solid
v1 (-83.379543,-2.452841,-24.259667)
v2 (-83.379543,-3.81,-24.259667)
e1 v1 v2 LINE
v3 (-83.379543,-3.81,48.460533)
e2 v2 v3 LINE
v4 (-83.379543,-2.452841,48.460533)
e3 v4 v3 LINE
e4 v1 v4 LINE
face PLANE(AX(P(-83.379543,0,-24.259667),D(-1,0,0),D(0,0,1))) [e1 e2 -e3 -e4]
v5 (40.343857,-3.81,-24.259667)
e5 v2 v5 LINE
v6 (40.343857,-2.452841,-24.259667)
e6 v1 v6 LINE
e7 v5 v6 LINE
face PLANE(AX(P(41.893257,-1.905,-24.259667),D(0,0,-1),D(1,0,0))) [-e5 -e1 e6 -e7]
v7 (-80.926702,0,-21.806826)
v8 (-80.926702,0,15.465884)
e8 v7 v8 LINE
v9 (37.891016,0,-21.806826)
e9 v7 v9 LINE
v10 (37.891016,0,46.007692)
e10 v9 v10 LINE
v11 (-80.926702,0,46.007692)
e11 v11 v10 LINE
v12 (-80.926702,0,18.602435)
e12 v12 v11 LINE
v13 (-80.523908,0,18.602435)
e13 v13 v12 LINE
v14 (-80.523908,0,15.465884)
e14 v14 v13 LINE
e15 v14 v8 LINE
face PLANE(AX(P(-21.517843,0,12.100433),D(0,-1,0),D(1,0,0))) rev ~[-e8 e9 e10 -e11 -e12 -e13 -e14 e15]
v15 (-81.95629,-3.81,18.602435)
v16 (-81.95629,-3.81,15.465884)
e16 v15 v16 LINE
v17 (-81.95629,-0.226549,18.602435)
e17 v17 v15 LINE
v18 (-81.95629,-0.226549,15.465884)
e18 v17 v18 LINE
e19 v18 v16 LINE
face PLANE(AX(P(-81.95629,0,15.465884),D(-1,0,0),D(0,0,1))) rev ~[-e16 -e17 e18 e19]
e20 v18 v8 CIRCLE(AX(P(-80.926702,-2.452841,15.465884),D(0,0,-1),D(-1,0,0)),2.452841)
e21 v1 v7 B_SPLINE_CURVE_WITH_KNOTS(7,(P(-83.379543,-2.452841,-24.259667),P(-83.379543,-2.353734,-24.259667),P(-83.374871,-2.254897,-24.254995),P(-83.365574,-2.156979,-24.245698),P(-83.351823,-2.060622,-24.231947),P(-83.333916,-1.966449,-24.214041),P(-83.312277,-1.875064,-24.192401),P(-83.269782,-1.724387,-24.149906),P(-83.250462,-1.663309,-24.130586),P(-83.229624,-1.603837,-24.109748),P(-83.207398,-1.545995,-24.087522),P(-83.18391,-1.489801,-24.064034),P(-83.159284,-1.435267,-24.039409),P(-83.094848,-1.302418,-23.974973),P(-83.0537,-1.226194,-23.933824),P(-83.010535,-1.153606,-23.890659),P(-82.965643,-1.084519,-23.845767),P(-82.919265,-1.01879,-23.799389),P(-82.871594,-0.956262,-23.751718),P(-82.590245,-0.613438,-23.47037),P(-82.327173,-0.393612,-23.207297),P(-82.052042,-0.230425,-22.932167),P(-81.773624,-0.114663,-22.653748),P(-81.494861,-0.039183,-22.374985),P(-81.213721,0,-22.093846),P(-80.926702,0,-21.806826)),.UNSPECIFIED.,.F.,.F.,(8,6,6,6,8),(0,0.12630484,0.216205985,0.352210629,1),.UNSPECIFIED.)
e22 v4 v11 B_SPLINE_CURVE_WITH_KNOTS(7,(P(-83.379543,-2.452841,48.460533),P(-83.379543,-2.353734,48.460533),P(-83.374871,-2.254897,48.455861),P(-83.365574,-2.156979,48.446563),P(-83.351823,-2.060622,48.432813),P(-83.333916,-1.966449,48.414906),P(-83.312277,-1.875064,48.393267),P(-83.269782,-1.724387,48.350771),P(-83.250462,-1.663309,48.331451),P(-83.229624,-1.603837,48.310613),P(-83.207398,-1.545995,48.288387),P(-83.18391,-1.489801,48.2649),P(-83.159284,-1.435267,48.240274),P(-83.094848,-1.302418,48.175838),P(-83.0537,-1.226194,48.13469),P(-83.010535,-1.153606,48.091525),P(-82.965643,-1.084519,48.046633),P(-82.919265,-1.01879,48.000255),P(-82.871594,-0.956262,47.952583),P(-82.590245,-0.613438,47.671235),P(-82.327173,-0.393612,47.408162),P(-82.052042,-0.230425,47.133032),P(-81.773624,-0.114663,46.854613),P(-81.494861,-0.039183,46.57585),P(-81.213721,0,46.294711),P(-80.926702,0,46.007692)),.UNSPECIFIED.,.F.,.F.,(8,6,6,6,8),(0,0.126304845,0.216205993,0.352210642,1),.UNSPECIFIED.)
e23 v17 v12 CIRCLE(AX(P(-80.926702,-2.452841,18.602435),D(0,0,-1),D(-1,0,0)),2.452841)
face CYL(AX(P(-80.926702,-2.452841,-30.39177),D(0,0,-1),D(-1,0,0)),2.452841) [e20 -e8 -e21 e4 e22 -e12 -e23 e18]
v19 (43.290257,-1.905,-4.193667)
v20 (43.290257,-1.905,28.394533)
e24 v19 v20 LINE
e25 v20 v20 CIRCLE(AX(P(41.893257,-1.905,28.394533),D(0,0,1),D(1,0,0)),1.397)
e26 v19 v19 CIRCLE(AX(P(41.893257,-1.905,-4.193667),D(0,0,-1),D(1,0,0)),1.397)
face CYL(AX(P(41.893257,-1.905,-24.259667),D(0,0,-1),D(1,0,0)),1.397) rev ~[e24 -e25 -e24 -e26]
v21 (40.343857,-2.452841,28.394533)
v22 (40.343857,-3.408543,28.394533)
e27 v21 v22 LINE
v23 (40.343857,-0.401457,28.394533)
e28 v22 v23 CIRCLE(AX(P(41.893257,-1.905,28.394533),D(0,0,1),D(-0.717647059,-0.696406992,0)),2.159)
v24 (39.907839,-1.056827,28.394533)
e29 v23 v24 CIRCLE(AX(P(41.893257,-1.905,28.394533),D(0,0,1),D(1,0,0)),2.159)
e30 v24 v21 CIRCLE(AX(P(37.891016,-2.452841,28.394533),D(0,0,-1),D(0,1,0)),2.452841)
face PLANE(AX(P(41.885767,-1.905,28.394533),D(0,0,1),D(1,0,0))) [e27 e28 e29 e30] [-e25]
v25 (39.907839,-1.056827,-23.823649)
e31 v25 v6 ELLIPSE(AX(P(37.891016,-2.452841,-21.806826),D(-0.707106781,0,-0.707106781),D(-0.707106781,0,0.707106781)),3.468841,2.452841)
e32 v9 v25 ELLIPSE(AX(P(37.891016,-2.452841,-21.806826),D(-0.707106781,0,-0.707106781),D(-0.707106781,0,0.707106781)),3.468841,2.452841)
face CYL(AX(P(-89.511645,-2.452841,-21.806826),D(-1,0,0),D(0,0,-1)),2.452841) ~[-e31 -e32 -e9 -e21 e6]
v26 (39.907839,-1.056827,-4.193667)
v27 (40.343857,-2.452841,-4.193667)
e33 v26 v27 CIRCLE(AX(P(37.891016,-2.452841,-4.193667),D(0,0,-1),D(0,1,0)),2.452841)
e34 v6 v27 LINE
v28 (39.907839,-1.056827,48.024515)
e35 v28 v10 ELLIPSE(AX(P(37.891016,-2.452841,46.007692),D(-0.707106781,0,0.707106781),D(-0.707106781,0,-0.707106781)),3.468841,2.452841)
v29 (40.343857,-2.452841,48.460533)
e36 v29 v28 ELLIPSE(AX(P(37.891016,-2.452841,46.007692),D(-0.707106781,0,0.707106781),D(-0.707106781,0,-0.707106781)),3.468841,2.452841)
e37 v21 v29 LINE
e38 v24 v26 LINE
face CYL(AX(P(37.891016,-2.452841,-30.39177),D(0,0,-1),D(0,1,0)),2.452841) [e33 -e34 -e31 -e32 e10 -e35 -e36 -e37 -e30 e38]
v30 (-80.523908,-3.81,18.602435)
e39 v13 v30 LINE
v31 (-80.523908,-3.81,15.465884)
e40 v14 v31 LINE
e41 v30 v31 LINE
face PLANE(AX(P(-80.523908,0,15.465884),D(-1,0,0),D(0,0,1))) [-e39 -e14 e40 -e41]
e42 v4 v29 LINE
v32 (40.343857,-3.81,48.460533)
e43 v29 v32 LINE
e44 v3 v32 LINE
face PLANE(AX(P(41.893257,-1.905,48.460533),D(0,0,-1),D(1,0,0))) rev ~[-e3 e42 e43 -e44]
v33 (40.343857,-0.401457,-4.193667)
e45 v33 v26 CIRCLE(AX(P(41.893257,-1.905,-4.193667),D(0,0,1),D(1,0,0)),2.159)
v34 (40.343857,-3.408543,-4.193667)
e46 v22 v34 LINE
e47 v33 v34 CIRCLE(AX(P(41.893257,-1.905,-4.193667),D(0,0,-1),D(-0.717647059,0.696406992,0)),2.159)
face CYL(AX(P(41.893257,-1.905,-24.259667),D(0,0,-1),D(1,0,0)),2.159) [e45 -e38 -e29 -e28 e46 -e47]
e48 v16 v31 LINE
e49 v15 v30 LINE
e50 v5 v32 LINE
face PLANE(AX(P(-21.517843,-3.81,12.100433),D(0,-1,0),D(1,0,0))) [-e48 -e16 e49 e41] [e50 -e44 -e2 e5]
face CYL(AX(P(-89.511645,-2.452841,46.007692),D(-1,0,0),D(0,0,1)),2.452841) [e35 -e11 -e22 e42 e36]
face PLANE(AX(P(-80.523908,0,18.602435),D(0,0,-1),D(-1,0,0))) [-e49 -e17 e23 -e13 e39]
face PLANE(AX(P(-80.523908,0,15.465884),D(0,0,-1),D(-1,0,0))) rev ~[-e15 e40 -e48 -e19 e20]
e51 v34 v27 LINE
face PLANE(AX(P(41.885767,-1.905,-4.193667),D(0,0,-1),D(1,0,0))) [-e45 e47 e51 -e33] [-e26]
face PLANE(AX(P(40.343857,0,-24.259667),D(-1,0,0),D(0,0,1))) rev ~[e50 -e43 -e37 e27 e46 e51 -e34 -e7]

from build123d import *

# Parameters (mm, degrees)
F0_W          = 123.7234
F0_H          = 72.7202
F1_DEPTH      = 3.81
F2_R          = 2.159
F2_R_2        = 1.397
F3_DEPTH      = 72.7202
F4_R          = 1.397
F5_DEPTH      = 20.066
F6_R          = 1.397
F7_DEPTH      = 20.066
F8_W          = 1.4323815703
F8_H          = 3.1365510076
F9_DEPTH      = 25.4
F10_T1_DEPTH  = 135.9876048969
F10_T3_DEPTH  = 84.9844048969
F10_T8_DEPTH  = 84.9844048969
F10_S10_R     = 2.159
F10_T11_DEPTH = 44
F10_T15_DEPTH = 84.9844048969
F10_S17_R     = 2.159
F10_T18_DEPTH = 44
F10_T22_DEPTH = 84.9844048969
F10_S24_R     = 2.159
F10_T25_DEPTH = 44
F10_T30_DEPTH = 84.9844048969
F10_S31_R     = 2.159
F10_T32_DEPTH = 44
F10_T37_DEPTH = 84.9844048969
F10_S38_R     = 2.159
F10_T39_DEPTH = 44


# Not quite as in the source:
# - a fillet or chamfer that OpenCascade refuses, or shapes differently, is made with other operations: its cross-section is extruded or revolved along the edge and cut away or added


with BuildPart() as f1:
    # F0 (on Front) → F1 (new body)
    with BuildSketch(Plane.XZ):
        with Locations((-21.517843008, 12.1004326615)):
            Rectangle(F0_W, F0_H)
    extrude(amount=F1_DEPTH)

    # F2 (on face) → F3 (join)
    with BuildSketch(Plane(origin=(0, 0, -24.2596673385), x_dir=(1, 0, 0), z_dir=(0, 0, -1))):
        with Locations((41.893256992, 1.905)):
            Circle(F2_R)
        with Locations((41.893256992, 1.905)):
            Circle(F2_R_2, mode=Mode.SUBTRACT)
    extrude(amount=-F3_DEPTH)

    # F4 (on face) → F5 (cut)
    with BuildSketch(Plane(origin=(0, 0, -24.2596673385), x_dir=(1, 0, 0), z_dir=(0, 0, -1))):
        with BuildLine():
            ThreePointArc((40.343856992, 0.4014573036), (44.052256992, 1.905), (40.343856992, 3.4085426964))
            Line((40.343856992, 3.4085426964), (40.343856992, 0.4014573036))
        make_face()
        with Locations((41.893256992, 1.905)):
            Circle(F4_R, mode=Mode.SUBTRACT)
    extrude(amount=-F5_DEPTH, mode=Mode.SUBTRACT)

    # F6 (on face) → F7 (cut)
    with BuildSketch(Plane.XY.offset(48.4605326615)):
        with BuildLine():
            ThreePointArc((40.343856992, -3.4085426964), (44.052256992, -1.905), (40.343856992, -0.4014573036))
            Line((40.343856992, -0.4014573036), (40.343856992, -3.4085426964))
        make_face()
        with Locations((41.893256992, -1.905)):
            Circle(F6_R, mode=Mode.SUBTRACT)
    extrude(amount=-F7_DEPTH, mode=Mode.SUBTRACT)

    # F8 (on face) → F9 (cut)
    with BuildSketch(Plane(origin=(0, 0, 0), x_dir=(-1, 0, 0), z_dir=(0, 1, 0))):
        with Locations((81.2400989234, 17.0341590419)):
            Rectangle(F8_W, F8_H)
    extrude(amount=-F9_DEPTH, mode=Mode.SUBTRACT)

    # F10: fillet of radius 2.4528409794 on 4 edges, made by hand

    # F10_s2 → F10_t1 (cut)
    with BuildSketch(Plane.YZ.offset(-89.5116454565)):
        with BuildLine():
            ThreePointArc((-2.4528409794, 48.4605326615), (-0.7184204897, 47.7421121718), (0, 46.0076916821))
            Line((0, 46.0076916821), (0, 48.4605326615))
            Line((0, 48.4605326615), (-2.4528409794, 48.4605326615))
        make_face()
        with BuildLine():
            ThreePointArc((-2.4528409794, -24.2596673385), (-0.7184204897, -23.5412468488), (0, -21.8068263591))
            Line((0, -21.8068263591), (0, -24.2596673385))
            Line((0, -24.2596673385), (-2.4528409794, -24.2596673385))
        make_face()
    extrude(amount=F10_T1_DEPTH, mode=Mode.SUBTRACT)

    # F10_s4 → F10_t3 (cut)
    with BuildSketch(Plane.XY.offset(-30.3917697869)):
        with BuildLine():
            ThreePointArc((-83.379543008, -2.4528409794), (-82.6611225184, -0.7184204897), (-80.9267020287, 0))
            Line((-80.9267020287, 0), (-83.379543008, 0))
            Line((-83.379543008, 0), (-83.379543008, -2.4528409794))
        make_face()
    extrude(amount=F10_T3_DEPTH, mode=Mode.SUBTRACT)


with BuildPart() as f10_tool6:
    # F10_s7 → F10_t8 (new body)
    with BuildSketch(Plane.XY.offset(-30.3917697869)):
        with BuildLine():
            ThreePointArc((37.8910160126, 0), (39.6254365023, -0.7184204897), (40.343856992, -2.4528409794))
            Line((40.343856992, -2.4528409794), (40.343856992, 0))
            Line((40.343856992, 0), (37.8910160126, 0))
        make_face()
    extrude(amount=F10_T8_DEPTH)

    split(bisect_by=Plane.XY.offset(-4.1936673385), keep=Keep.BOTTOM)

    # F10_s10 → F10_t11 (cut, symmetric)
    with BuildSketch(Plane.XY.offset(12.1)):
        with Locations((41.893256992, -1.905)):
            Circle(F10_S10_R)
    extrude(amount=F10_T11_DEPTH, both=True, mode=Mode.SUBTRACT)


with BuildPart() as f1_1:
    add(f1.part)

    # F10_t5: cut F10_tool6
    add(f10_tool6.part, mode=Mode.SUBTRACT)


with BuildPart() as f10_tool13:
    # F10_s14 → F10_t15 (new body)
    with BuildSketch(Plane.XY.offset(-30.3917697869)):
        with BuildLine():
            ThreePointArc((37.8910160126, 0), (39.6254365023, -0.7184204897), (40.343856992, -2.4528409794))
            Line((40.343856992, -2.4528409794), (40.343856992, 0))
            Line((40.343856992, 0), (37.8910160126, 0))
        make_face()
    extrude(amount=F10_T15_DEPTH)

    split(bisect_by=Plane.XY.offset(-4.1936673385), keep=Keep.BOTTOM)

    # F10_s17 → F10_t18 (intersect, symmetric)
    with BuildSketch(Plane.XY.offset(12.1)):
        with Locations((41.893256992, -1.905)):
            Circle(F10_S17_R)
    extrude(amount=F10_T18_DEPTH, both=True, mode=Mode.INTERSECT)


with BuildPart() as f1_2:
    add(f1_1.part)

    # F10_t12: cut F10_tool13
    add(f10_tool13.part, mode=Mode.SUBTRACT)


with BuildPart() as f10_tool20:
    # F10_s21 → F10_t22 (new body)
    with BuildSketch(Plane.XY.offset(-30.3917697869)):
        with BuildLine():
            ThreePointArc((37.8910160126, 0), (39.6254365023, -0.7184204897), (40.343856992, -2.4528409794))
            Line((40.343856992, -2.4528409794), (40.343856992, 0))
            Line((40.343856992, 0), (37.8910160126, 0))
        make_face()
    extrude(amount=F10_T22_DEPTH)

    split(bisect_by=Plane.XY.offset(-4.1936673385), keep=Keep.TOP)

    # F10_s24 → F10_t25 (cut, symmetric)
    with BuildSketch(Plane.XY.offset(12.1)):
        with Locations((41.893256992, -1.905)):
            Circle(F10_S24_R)
    extrude(amount=F10_T25_DEPTH, both=True, mode=Mode.SUBTRACT)

    split(bisect_by=Plane.XY.offset(28.3945326615), keep=Keep.BOTTOM)


with BuildPart() as f1_3:
    add(f1_2.part)

    # F10_t19: cut F10_tool20
    add(f10_tool20.part, mode=Mode.SUBTRACT)


with BuildPart() as f10_tool28:
    # F10_s29 → F10_t30 (new body)
    with BuildSketch(Plane.XY.offset(-30.3917697869)):
        with BuildLine():
            ThreePointArc((37.8910160126, 0), (39.6254365023, -0.7184204897), (40.343856992, -2.4528409794))
            Line((40.343856992, -2.4528409794), (40.343856992, 0))
            Line((40.343856992, 0), (37.8910160126, 0))
        make_face()
    extrude(amount=F10_T30_DEPTH)

    # F10_s31 → F10_t32 (cut, symmetric)
    with BuildSketch(Plane.XY.offset(12.1)):
        with Locations((41.893256992, -1.905)):
            Circle(F10_S31_R)
    extrude(amount=F10_T32_DEPTH, both=True, mode=Mode.SUBTRACT)

    split(bisect_by=Plane.XY.offset(28.3945326615), keep=Keep.TOP)


with BuildPart() as f1_4:
    add(f1_3.part)

    # F10_t27: cut F10_tool28
    add(f10_tool28.part, mode=Mode.SUBTRACT)


with BuildPart() as f10_tool35:
    # F10_s36 → F10_t37 (new body)
    with BuildSketch(Plane.XY.offset(-30.3917697869)):
        with BuildLine():
            ThreePointArc((37.8910160126, 0), (39.6254365023, -0.7184204897), (40.343856992, -2.4528409794))
            Line((40.343856992, -2.4528409794), (40.343856992, 0))
            Line((40.343856992, 0), (37.8910160126, 0))
        make_face()
    extrude(amount=F10_T37_DEPTH)

    # F10_s38 → F10_t39 (intersect, symmetric)
    with BuildSketch(Plane.XY.offset(12.1)):
        with Locations((41.893256992, -1.905)):
            Circle(F10_S38_R)
    extrude(amount=F10_T39_DEPTH, both=True, mode=Mode.INTERSECT)

    split(bisect_by=Plane.XY.offset(28.3945326615), keep=Keep.TOP)


with BuildPart() as f1_5:
    add(f1_4.part)

    # F10_t34: cut F10_tool35
    add(f10_tool35.part, mode=Mode.SUBTRACT)


solid = f1_5.part
